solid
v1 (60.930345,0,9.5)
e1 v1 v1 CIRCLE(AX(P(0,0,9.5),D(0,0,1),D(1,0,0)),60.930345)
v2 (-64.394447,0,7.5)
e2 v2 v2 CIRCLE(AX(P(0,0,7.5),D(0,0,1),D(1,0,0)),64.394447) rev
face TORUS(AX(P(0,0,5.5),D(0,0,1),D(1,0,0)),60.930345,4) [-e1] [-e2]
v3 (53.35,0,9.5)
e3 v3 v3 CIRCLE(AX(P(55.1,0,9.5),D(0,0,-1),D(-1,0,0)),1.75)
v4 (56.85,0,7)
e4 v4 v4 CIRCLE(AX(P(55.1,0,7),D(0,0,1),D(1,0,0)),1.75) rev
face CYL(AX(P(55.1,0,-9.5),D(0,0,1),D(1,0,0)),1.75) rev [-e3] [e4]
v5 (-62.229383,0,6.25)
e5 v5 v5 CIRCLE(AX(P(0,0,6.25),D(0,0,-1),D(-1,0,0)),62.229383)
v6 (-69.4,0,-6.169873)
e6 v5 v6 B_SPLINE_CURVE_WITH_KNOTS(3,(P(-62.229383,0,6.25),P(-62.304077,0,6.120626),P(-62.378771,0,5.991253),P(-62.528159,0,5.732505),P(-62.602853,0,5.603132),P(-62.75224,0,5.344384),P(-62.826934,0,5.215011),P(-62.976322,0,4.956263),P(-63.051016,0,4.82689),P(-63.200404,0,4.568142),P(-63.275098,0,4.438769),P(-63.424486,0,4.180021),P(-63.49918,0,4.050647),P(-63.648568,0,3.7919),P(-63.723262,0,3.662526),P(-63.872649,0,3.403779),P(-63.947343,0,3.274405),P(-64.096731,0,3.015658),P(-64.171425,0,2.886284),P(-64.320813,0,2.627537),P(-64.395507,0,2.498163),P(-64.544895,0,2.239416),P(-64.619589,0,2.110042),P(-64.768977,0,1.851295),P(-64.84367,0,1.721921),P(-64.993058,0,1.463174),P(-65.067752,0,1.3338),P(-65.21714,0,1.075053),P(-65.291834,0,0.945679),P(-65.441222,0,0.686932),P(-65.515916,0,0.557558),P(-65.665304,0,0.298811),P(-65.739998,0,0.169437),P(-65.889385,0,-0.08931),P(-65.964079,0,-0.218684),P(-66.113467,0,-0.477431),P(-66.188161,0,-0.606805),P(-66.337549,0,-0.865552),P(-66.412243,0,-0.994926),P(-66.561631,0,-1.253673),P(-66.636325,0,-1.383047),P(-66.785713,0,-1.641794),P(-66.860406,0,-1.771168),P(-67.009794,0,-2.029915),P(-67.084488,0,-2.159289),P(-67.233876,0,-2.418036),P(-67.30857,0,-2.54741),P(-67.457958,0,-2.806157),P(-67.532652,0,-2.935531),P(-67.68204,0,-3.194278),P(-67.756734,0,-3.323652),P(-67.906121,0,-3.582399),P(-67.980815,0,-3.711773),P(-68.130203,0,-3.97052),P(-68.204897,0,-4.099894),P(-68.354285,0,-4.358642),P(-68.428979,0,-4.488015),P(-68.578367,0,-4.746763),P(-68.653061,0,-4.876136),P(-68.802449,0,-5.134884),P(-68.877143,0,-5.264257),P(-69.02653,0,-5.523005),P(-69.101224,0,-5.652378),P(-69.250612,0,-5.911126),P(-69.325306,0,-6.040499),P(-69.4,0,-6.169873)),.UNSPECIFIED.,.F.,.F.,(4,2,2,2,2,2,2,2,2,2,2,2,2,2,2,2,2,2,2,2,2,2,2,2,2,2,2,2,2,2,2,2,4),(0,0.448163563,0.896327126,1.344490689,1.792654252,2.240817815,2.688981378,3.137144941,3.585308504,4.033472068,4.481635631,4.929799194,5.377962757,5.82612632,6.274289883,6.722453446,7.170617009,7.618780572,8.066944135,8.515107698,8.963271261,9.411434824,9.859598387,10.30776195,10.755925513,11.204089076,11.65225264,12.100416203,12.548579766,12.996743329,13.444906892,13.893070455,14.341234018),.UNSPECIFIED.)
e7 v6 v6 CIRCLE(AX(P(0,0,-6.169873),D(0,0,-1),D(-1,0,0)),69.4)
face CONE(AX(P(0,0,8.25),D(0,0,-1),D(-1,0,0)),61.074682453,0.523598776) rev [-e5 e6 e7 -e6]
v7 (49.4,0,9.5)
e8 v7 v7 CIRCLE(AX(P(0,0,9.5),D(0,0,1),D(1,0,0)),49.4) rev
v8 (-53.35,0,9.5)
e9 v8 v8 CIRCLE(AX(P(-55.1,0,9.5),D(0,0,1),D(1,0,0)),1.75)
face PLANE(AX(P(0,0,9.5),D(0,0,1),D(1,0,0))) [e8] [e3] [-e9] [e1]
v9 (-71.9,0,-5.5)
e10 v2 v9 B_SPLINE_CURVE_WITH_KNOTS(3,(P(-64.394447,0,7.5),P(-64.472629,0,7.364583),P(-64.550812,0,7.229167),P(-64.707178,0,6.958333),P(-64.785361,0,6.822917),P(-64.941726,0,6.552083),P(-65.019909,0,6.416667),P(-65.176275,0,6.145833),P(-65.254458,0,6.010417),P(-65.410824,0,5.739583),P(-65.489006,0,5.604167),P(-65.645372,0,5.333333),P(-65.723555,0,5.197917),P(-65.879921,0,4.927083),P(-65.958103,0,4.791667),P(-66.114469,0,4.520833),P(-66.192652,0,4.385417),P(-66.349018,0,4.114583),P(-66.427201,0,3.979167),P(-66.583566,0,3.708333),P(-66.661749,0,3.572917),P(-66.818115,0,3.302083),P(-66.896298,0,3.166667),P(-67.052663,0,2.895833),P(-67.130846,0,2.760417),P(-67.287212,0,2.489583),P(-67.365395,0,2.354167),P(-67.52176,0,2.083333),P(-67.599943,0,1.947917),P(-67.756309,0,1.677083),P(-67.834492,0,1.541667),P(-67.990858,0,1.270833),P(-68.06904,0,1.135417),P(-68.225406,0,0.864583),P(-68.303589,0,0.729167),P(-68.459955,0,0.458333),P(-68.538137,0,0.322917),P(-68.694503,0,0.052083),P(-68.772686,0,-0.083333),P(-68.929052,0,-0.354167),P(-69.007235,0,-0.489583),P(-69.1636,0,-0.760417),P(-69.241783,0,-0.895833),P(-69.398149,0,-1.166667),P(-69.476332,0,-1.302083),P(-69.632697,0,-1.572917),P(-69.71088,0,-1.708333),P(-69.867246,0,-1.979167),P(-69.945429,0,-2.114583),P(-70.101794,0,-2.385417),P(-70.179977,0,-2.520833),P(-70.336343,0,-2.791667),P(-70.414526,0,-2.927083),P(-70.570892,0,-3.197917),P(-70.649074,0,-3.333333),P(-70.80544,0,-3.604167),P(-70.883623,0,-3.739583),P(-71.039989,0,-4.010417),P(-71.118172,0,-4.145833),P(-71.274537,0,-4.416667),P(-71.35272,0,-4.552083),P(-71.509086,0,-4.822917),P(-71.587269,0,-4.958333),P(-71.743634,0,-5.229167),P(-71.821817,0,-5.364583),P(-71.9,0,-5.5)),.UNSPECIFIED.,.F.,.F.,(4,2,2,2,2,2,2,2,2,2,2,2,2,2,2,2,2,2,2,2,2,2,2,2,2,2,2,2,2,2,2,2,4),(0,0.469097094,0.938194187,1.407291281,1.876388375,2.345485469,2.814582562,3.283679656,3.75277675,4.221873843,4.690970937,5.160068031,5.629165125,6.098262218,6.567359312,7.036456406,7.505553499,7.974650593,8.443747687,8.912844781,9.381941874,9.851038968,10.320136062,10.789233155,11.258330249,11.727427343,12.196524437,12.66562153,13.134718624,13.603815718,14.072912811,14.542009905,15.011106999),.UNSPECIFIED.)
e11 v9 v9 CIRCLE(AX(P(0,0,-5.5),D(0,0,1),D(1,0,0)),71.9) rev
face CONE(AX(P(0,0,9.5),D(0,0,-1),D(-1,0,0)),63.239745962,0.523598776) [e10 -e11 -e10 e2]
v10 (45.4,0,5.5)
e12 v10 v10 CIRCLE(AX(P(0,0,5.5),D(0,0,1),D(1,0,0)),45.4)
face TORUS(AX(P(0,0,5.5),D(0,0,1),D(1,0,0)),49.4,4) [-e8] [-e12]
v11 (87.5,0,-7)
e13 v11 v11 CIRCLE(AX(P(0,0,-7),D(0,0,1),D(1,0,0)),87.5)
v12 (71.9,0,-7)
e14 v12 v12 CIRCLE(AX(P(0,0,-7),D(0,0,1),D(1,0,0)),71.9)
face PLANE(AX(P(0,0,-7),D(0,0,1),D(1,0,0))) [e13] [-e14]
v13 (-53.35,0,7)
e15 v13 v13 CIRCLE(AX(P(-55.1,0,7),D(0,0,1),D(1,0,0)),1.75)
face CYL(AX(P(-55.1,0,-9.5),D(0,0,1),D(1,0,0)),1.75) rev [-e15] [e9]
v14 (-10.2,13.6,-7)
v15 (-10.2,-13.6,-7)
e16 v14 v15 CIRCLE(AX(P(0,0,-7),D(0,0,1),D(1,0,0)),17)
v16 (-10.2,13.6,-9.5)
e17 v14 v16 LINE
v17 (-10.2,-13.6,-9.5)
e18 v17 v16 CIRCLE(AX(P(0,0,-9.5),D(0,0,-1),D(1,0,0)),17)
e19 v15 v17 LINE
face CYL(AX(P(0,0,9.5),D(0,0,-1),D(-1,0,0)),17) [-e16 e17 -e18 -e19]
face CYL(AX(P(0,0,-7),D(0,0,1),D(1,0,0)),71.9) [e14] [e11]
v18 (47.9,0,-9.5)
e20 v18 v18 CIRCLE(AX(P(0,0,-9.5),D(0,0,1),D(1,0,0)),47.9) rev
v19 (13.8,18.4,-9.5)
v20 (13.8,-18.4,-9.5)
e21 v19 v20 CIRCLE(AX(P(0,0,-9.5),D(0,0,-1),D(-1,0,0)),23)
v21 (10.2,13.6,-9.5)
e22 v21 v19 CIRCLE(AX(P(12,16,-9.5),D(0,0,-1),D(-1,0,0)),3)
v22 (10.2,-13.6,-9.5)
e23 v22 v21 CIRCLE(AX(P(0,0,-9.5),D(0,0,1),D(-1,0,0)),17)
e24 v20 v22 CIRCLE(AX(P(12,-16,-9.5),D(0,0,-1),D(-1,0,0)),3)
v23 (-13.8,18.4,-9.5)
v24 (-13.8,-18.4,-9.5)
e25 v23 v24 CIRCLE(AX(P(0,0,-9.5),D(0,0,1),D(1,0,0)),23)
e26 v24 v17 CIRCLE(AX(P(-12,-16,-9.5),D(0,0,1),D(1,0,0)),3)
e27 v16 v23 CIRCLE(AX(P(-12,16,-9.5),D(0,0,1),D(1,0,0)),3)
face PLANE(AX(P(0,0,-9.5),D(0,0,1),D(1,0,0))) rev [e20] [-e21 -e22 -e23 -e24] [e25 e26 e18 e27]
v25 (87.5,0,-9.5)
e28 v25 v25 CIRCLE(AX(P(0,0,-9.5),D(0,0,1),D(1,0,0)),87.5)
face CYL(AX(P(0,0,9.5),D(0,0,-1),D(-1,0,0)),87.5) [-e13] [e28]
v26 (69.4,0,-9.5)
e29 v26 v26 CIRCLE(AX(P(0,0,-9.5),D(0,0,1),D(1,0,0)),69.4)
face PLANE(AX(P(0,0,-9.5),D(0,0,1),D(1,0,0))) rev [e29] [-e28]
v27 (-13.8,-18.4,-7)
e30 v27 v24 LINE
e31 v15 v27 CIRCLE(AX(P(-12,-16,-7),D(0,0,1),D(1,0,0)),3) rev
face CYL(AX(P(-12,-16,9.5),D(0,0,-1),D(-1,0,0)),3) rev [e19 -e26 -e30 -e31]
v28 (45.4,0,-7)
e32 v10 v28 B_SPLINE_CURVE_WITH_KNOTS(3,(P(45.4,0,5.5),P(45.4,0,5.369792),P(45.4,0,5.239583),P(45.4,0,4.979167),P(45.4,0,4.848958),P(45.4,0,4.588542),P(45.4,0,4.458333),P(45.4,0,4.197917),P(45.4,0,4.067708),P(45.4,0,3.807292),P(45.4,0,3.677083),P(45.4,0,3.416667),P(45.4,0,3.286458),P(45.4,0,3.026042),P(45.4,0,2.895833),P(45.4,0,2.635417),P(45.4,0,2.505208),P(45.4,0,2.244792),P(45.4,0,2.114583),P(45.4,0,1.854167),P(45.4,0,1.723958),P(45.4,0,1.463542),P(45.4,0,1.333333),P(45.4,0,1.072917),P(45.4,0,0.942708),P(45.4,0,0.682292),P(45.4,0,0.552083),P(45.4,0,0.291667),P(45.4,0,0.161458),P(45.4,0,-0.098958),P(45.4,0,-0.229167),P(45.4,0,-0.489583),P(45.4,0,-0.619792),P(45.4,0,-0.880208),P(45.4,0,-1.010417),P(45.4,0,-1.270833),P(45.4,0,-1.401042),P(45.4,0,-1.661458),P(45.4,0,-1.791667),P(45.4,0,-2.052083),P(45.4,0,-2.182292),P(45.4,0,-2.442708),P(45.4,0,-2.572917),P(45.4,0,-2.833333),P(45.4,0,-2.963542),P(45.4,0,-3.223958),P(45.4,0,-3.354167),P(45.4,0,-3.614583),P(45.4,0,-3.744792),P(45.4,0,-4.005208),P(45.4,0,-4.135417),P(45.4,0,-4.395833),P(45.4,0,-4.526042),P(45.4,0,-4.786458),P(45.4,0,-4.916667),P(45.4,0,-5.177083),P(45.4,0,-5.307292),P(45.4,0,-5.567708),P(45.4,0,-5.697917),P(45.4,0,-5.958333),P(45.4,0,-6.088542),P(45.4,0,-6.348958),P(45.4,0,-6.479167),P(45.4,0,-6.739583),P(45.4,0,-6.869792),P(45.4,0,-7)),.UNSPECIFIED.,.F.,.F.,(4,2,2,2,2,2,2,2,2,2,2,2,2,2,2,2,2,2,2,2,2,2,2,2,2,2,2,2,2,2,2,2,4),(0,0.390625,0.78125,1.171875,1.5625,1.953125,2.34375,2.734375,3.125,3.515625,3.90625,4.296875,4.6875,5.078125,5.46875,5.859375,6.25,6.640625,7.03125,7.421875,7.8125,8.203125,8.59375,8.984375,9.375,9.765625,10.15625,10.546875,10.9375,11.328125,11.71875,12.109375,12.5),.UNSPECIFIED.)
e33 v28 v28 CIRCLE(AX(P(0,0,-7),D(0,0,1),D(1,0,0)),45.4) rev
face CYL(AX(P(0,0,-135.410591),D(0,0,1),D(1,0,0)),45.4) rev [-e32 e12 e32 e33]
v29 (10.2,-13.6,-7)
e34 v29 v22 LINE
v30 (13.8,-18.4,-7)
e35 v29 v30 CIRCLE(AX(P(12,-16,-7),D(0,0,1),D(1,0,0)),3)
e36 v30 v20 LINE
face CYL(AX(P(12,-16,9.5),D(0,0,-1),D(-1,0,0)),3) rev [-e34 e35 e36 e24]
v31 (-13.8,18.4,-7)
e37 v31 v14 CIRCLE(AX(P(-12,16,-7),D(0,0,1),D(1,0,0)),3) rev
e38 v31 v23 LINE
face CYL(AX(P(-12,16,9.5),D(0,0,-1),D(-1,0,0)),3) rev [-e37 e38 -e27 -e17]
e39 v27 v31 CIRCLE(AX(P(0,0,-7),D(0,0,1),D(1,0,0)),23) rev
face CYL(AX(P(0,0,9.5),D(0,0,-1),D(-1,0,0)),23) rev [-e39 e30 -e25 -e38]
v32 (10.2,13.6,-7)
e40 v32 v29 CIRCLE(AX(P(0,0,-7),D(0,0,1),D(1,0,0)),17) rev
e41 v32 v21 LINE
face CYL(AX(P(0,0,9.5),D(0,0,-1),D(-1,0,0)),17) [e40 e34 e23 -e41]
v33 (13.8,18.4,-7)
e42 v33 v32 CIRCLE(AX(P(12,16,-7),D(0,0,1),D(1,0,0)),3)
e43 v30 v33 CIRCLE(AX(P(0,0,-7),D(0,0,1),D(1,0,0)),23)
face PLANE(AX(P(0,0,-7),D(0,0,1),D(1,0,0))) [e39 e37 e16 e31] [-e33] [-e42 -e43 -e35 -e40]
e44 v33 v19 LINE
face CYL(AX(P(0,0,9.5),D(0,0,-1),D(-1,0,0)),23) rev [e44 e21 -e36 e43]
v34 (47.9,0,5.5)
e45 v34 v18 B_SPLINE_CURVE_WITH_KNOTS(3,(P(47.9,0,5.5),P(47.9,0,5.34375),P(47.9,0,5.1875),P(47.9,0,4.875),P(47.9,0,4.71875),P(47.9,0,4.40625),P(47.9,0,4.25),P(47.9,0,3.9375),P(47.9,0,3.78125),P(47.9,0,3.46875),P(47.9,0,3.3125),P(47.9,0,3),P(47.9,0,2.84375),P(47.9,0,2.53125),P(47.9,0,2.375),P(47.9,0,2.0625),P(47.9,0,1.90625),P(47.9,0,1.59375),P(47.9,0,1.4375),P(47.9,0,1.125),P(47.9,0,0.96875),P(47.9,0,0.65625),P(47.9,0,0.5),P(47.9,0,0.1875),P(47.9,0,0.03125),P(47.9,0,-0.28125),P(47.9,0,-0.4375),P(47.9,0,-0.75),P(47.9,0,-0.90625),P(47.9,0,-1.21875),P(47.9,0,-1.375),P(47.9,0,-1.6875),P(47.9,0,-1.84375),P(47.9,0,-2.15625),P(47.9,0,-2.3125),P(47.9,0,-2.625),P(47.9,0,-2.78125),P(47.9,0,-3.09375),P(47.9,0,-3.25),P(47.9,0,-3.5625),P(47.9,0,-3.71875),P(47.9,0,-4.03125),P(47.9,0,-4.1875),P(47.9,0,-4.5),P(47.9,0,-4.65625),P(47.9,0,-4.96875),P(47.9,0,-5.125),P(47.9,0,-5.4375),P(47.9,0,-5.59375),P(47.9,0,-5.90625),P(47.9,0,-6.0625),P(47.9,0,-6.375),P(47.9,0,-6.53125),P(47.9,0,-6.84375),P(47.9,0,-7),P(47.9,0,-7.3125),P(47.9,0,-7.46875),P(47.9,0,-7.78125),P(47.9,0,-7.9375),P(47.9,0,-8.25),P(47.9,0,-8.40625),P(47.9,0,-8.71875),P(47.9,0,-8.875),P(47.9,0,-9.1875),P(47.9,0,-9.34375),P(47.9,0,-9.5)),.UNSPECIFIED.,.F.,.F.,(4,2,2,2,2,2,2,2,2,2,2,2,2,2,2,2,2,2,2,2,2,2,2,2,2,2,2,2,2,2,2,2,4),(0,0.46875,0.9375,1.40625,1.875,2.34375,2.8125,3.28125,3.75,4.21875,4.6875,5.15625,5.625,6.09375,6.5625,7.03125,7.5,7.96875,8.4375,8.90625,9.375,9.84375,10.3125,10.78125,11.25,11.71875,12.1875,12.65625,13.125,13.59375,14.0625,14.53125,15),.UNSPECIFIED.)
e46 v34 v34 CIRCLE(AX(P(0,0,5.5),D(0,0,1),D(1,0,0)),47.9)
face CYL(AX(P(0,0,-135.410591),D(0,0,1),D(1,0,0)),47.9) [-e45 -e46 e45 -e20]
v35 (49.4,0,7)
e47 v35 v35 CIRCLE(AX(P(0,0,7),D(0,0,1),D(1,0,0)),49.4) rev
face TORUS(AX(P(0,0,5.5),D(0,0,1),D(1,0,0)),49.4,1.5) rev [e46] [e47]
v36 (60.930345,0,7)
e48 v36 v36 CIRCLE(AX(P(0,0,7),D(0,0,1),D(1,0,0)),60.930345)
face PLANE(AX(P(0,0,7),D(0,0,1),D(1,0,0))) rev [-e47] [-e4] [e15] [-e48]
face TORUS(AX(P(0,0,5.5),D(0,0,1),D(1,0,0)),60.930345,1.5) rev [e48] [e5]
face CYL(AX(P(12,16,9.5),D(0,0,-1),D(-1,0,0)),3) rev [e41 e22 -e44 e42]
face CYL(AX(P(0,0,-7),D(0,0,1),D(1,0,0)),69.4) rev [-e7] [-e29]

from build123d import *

# Parameters (mm, degrees)
SKETCH1_R           = 87.5
BOSS_EXTRUDE1_DEPTH = 9.5
SKETCH2_R           = 87.5
SKETCH2_R_2         = 71.9
CUT_EXTRUDE1_DEPTH  = 16.5
SKETCH3_R           = 45.4
CUT_EXTRUDE2_DEPTH  = 16.5
CHAMFER1_SIZE       = 15
CHAMFER1_SIZE2      = 8.660254038
FILLET1_R           = 4
CUT_EXTRUDE3_DEPTH  = 126.193849689
SKETCH6_R           = 1.75
CUT_EXTRUDE4_DEPTH  = 126.193849689


# Read off the part's stored shape, not the designer's step: Shell1
with BuildPart() as part:
    # Sketch1 → Boss-Extrude1 (new, symmetric)
    with BuildSketch(Plane.XY):
        Circle(SKETCH1_R)
    extrude(amount=BOSS_EXTRUDE1_DEPTH, both=True)

    # Sketch2 → Cut-Extrude1 (cut)
    with BuildSketch(Plane.XY.offset(9.5)):
        Circle(SKETCH2_R)
        Circle(SKETCH2_R_2, mode=Mode.SUBTRACT)
    extrude(amount=-CUT_EXTRUDE1_DEPTH, mode=Mode.SUBTRACT)

    # Sketch3 → Cut-Extrude2 (cut)
    with BuildSketch(Plane.XY.offset(9.5)):
        Circle(SKETCH3_R)
    extrude(amount=-CUT_EXTRUDE2_DEPTH, mode=Mode.SUBTRACT)

    # Chamfer1
    chamfer1_edges = [part.edges().sort_by_distance(p)[0] for p in [
        (-71.9, 0, 9.5),
    ]]
    chamfer1_side = [part.faces().sort_by_distance(p)[0] for p in [
        (-71.9, 0, 1.25),
    ]]
    chamfer(chamfer1_edges, length=CHAMFER1_SIZE, length2=CHAMFER1_SIZE2, reference=chamfer1_side[0])

    # Fillet1
    fillet1_edges = [part.edges().sort_by_distance(p)[0] for p in [
        (-45.4, 0, 9.5),
        (-63.239745962, 0, 9.5),
    ]]
    fillet(fillet1_edges, radius=FILLET1_R)

    # Shell1 outline → Shell1 (revolve, cut)
    with BuildSketch(Plane.XZ):
        with BuildLine():
            Line((47.9, -9.5), (69.4, -9.5))
            Line((69.4, -9.5), (69.4, -6.169872981))
            Line((69.4, -6.169872981), (62.229382991, 6.25))
            ThreePointArc((62.229382991, 6.25), (61.680344885, 6.799038106), (60.930344885, 7))
            Line((60.930344885, 7), (49.4, 7))
            ThreePointArc((49.4, 7), (48.339339828, 6.560660172), (47.9, 5.5))
            Line((47.9, 5.5), (47.9, -9.5))
        make_face()
    revolve(axis=Axis((0, 0, 0), (0, 0, 1)), mode=Mode.SUBTRACT)

    # Sketch5 → Cut-Extrude3 (cut, through all)
    with BuildSketch(Plane(origin=(0, 0, -9.5), x_dir=(-1, 0, 0), z_dir=(0, 0, -1))):
        with BuildLine():
            ThreePointArc((-13.8, 18.4), (-23, 0), (-13.8, -18.4))
            ThreePointArc((-13.8, -18.4), (-9.6, -17.8), (-10.2, -13.6))
            ThreePointArc((-10.2, -13.6), (-17, 0), (-10.2, 13.6))
            ThreePointArc((-10.2, 13.6), (-9.6, 17.8), (-13.8, 18.4))
        make_face()
    cut_extrude3 = extrude(amount=-CUT_EXTRUDE3_DEPTH, mode=Mode.SUBTRACT)

    # Mirror1: Cut-Extrude3 across plane
    add(cut_extrude3.mirror(Plane(origin=(0, 0, 0), x_dir=(0, 0, 1), z_dir=(1, 0, 0))), mode=Mode.SUBTRACT)

    # Sketch6 → Cut-Extrude4 (cut, through all)
    with BuildSketch(Plane.XY.offset(9.5)):
        with Locations((-55.1, 0)):
            Circle(SKETCH6_R)
    cut_extrude4 = extrude(amount=-CUT_EXTRUDE4_DEPTH, mode=Mode.SUBTRACT)

    # Mirror2: Cut-Extrude4 across plane
    add(cut_extrude4.mirror(Plane(origin=(0, 0, 0), x_dir=(0, 0, 1), z_dir=(1, 0, 0))), mode=Mode.SUBTRACT)


solid = part.part
